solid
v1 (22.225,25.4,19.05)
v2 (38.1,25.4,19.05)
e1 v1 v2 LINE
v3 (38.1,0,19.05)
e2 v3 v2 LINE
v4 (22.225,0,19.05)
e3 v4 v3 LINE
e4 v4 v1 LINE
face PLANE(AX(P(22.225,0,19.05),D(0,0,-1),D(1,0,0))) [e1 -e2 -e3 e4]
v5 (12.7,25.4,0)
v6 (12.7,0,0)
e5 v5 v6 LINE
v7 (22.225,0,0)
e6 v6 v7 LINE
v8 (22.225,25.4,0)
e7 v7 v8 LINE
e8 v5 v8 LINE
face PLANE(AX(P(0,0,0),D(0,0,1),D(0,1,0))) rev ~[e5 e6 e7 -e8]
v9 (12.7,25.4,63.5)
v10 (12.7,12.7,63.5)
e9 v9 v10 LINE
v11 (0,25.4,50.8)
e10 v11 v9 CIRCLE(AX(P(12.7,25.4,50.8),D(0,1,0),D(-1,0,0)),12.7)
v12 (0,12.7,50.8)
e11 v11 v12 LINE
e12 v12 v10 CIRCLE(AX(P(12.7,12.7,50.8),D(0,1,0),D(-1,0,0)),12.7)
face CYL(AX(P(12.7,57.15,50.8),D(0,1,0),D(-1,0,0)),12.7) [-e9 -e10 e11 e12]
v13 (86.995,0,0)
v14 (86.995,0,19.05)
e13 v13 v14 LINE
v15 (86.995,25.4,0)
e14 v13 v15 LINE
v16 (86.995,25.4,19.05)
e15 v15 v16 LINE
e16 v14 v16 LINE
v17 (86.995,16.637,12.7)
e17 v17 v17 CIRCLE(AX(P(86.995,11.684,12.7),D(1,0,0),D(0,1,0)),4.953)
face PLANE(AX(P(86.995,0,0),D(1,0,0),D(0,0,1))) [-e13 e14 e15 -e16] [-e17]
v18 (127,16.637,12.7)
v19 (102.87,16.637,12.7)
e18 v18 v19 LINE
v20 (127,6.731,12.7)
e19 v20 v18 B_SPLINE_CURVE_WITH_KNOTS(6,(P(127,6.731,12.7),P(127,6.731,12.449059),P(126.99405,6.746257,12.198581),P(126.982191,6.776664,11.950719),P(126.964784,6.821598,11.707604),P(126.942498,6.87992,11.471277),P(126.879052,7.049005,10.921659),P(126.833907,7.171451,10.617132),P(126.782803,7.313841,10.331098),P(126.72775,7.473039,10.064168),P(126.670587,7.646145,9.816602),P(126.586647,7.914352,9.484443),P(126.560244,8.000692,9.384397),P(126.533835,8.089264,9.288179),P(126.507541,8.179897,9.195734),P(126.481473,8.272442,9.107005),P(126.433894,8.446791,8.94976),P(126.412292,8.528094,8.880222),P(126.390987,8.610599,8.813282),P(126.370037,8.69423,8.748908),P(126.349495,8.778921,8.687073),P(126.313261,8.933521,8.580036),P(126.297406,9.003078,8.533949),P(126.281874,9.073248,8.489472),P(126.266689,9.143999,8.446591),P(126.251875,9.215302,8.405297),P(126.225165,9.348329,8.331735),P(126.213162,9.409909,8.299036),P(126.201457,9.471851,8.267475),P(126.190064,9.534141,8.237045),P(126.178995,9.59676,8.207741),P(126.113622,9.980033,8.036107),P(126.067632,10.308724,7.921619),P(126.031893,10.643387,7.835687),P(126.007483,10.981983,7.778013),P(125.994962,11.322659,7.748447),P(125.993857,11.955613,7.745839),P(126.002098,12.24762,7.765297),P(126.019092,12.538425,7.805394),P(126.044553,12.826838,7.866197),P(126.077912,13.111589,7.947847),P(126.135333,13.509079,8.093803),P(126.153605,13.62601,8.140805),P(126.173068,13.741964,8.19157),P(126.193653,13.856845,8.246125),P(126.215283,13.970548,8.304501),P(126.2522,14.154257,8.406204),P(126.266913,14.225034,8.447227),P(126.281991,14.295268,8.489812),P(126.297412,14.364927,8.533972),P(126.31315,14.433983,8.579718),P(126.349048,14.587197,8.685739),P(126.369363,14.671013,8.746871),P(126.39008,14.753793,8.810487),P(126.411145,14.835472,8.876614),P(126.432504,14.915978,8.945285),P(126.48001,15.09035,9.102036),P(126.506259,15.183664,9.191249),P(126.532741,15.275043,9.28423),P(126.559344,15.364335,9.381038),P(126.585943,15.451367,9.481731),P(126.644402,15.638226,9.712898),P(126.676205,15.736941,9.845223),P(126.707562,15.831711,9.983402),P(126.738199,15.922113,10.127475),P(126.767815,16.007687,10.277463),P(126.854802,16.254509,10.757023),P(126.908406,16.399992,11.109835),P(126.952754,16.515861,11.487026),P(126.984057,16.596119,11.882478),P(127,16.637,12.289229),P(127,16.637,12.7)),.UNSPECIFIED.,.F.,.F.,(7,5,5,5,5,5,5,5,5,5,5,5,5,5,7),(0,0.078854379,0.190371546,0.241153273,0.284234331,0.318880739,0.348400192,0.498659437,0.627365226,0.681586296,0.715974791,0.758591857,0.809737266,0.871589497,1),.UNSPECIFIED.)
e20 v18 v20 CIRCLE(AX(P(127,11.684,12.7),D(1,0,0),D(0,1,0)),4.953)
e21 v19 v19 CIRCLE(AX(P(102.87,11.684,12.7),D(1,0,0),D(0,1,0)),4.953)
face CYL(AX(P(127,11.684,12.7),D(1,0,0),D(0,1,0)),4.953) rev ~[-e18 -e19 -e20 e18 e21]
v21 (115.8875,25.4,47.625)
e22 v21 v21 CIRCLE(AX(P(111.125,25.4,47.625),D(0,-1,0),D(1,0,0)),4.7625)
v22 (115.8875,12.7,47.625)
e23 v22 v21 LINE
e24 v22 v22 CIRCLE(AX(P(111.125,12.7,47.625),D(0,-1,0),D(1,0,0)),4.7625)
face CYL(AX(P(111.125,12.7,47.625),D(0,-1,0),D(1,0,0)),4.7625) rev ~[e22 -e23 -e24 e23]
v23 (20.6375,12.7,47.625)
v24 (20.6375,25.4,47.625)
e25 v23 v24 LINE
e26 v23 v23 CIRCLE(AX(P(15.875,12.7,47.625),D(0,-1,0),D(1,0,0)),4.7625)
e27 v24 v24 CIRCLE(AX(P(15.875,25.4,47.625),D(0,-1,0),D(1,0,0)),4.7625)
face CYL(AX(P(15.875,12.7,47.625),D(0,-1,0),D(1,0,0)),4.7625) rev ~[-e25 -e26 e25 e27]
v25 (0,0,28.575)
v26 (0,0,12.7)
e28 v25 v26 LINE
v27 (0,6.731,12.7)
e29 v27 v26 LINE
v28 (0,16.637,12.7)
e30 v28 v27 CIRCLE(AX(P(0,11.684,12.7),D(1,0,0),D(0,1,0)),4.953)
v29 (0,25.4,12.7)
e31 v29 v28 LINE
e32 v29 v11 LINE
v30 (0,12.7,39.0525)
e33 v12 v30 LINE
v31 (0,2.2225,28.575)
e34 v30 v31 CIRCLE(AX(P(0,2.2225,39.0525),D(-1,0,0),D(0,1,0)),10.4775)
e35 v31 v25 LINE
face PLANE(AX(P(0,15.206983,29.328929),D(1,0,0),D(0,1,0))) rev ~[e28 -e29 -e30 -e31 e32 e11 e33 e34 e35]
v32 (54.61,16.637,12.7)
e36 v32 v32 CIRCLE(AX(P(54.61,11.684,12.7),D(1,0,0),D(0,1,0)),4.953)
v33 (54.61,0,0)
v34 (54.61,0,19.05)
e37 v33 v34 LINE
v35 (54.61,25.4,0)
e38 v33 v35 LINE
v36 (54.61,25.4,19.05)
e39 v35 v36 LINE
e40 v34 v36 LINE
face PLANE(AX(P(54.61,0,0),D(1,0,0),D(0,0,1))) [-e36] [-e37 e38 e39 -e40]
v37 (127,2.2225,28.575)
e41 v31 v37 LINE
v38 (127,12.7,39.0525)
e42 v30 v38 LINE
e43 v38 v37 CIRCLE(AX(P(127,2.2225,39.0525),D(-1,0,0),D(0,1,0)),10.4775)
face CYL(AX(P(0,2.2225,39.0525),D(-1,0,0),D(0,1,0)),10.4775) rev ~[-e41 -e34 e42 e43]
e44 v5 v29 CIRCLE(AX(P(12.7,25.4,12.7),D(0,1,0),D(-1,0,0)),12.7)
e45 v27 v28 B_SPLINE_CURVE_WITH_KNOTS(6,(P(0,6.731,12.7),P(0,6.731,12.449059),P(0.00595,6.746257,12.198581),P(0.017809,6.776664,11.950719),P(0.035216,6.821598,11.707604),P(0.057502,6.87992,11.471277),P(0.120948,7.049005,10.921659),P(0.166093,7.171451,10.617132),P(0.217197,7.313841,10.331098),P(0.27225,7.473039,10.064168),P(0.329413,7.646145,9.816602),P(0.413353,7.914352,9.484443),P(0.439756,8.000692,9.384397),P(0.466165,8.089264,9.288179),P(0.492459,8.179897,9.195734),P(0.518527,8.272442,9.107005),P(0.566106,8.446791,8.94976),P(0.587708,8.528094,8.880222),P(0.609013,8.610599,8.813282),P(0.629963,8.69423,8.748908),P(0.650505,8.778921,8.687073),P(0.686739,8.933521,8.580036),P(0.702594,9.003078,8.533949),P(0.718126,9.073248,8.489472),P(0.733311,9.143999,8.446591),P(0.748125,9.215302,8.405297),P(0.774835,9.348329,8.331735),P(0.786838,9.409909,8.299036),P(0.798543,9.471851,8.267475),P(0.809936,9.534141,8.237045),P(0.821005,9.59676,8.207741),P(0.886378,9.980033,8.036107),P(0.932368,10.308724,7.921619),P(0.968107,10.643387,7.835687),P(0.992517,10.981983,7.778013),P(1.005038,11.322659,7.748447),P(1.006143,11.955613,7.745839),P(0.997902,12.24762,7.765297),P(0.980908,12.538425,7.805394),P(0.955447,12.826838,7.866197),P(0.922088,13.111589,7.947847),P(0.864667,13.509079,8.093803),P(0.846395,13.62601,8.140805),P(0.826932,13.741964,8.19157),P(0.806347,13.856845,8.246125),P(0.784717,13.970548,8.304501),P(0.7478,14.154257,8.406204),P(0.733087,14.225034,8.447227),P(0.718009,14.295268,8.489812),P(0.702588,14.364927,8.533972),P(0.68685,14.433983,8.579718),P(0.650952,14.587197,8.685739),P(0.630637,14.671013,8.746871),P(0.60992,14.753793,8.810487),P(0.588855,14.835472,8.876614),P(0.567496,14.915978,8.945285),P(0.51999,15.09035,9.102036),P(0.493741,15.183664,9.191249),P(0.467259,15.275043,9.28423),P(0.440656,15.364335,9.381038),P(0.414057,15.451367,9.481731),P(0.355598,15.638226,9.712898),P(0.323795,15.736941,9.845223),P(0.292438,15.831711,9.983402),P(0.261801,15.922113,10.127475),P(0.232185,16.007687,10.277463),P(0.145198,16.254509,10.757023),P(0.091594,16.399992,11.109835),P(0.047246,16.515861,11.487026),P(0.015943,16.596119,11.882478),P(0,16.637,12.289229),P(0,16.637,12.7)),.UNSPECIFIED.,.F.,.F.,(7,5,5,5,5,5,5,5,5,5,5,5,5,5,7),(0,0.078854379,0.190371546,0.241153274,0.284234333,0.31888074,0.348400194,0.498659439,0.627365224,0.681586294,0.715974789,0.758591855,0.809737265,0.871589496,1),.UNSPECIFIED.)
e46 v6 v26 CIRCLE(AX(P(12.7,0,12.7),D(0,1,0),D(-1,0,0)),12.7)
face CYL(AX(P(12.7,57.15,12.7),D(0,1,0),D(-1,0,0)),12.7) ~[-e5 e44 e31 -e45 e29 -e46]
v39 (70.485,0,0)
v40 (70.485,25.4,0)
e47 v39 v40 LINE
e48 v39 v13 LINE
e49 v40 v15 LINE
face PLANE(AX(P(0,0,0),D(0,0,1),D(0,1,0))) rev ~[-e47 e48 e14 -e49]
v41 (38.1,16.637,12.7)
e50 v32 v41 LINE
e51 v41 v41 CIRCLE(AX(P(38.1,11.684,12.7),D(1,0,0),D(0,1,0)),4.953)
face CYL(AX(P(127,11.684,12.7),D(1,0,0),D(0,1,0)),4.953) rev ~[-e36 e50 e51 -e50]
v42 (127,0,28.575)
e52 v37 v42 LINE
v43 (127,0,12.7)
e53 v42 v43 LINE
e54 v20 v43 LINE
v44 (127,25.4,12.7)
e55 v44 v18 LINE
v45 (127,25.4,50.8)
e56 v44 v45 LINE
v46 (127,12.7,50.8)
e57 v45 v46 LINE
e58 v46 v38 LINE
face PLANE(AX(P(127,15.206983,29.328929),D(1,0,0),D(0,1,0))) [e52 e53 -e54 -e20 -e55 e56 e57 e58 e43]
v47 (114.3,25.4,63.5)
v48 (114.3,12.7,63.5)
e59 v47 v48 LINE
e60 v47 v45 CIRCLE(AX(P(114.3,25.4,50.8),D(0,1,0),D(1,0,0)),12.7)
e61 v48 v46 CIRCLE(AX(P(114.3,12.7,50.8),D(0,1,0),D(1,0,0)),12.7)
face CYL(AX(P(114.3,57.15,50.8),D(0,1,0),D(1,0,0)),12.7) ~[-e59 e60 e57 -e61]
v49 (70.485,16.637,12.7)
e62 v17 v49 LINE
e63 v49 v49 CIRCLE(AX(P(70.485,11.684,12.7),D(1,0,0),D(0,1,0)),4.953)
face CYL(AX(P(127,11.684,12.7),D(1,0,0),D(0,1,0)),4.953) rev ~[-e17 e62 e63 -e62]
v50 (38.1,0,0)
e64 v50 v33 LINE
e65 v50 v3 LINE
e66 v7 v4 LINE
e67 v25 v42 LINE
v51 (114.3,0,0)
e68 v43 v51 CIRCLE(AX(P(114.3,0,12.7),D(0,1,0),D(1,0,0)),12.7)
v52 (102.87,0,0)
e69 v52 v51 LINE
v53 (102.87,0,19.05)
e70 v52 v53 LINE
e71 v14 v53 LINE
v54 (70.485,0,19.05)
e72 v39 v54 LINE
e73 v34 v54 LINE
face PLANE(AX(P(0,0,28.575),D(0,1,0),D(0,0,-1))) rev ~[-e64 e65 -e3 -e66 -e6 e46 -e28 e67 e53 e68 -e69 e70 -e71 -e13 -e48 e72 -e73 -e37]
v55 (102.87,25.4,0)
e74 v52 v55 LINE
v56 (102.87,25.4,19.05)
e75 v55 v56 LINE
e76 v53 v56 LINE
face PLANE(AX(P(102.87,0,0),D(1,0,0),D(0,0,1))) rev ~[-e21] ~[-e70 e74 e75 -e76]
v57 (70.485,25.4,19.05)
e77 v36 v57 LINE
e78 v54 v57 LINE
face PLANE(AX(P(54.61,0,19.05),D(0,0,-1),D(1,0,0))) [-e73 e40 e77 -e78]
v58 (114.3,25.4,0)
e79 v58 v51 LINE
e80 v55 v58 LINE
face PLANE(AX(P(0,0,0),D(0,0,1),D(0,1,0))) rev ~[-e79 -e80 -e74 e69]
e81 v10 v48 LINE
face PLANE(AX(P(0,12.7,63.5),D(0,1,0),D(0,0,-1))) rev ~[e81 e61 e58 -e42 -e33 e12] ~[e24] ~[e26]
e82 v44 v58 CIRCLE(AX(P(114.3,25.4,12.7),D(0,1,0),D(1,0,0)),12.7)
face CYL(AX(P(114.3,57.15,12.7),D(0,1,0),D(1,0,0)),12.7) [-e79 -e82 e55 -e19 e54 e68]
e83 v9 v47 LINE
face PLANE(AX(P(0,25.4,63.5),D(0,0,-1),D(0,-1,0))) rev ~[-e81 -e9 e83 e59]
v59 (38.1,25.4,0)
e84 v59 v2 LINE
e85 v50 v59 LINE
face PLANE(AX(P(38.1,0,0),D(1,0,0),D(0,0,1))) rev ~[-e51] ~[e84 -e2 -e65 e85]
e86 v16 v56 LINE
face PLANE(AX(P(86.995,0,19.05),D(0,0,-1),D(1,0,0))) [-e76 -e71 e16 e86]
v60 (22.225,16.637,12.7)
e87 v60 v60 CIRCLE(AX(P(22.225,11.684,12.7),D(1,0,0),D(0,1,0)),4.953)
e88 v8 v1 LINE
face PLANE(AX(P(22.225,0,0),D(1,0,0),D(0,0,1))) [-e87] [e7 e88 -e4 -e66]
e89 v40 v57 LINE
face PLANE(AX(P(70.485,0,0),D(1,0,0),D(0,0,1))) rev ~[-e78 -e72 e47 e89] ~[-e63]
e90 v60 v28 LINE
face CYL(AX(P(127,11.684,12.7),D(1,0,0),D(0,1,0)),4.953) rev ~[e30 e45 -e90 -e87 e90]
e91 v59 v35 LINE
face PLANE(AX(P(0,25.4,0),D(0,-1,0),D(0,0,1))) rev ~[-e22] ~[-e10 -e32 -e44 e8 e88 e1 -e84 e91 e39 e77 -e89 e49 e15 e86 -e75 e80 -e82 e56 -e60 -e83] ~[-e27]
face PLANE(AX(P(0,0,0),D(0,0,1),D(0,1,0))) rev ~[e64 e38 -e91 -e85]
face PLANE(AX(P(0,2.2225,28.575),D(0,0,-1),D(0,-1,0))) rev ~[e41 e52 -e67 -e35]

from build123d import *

# Parameters (mm, degrees)
F1_DEPTH    = 127
F2_R        = 4.7625
F3_DEPTH    = 25.4
F4_W        = 15.875
F4_H        = 19.05
F5_DEPTH    = 25.401
F6_R        = 4.953
F7_DEPTH    = 127.001
F8_T1_DEPTH = 76.2
F8_T3_DEPTH = 88.9


# Not quite as in the source:
# - a fillet or chamfer that OpenCascade refuses, or shapes differently, is made with other operations: its cross-section is extruded or revolved along the edge and cut away or added


with BuildPart() as f1:
    # F0 (on Right) → F1 (new body)
    with BuildSketch(Plane.YZ):
        with BuildLine():
            Line((0, 28.575), (0, 0))
            Line((0, 0), (25.4, 0))
            Line((25.4, 0), (25.4, 63.5))
            Line((25.4, 63.5), (12.7, 63.5))
            Line((12.7, 63.5), (12.7, 39.0525))
            ThreePointArc((12.7, 39.0525), (9.6312112999, 31.6437887001), (2.2225, 28.575))
            Line((2.2225, 28.575), (0, 28.575))
        make_face()
    extrude(amount=F1_DEPTH)

    # F2 (on face) → F3 (cut)
    with BuildSketch(Plane.XZ.offset(-12.7)):
        with Locations((111.125, 47.625)):
            Circle(F2_R)
        with Locations((15.875, 47.625)):
            Circle(F2_R)
    extrude(amount=-F3_DEPTH, mode=Mode.SUBTRACT)

    # F4 (on face) → F5 (cut, through all)
    with BuildSketch(Plane.XZ):
        with Locations((94.9325, 9.525)):
            Rectangle(F4_W, F4_H)
        with Locations((62.5475, 9.525)):
            Rectangle(F4_W, F4_H)
        with Locations((30.1625, 9.525)):
            Rectangle(F4_W, F4_H)
    extrude(amount=-F5_DEPTH, mode=Mode.SUBTRACT)

    # F6 (on face) → F7 (cut, through all)
    with BuildSketch(Plane.YZ.offset(127)):
        with Locations((11.684, 12.7)):
            Circle(F6_R)
    extrude(amount=-F7_DEPTH, mode=Mode.SUBTRACT)

    # F8: fillet of radius 12.7 on 4 edges, made by hand

    # F8_s2 → F8_t1 (cut)
    with BuildSketch(Plane.XZ.offset(-57.15)):
        with BuildLine():
            ThreePointArc((0, 50.8), (3.7197438789, 59.7802561211), (12.7, 63.5))
            Line((12.7, 63.5), (0, 63.5))
            Line((0, 63.5), (0, 50.8))
        make_face()
        with BuildLine():
            ThreePointArc((127, 50.8), (123.2802561211, 59.7802561211), (114.3, 63.5))
            Line((114.3, 63.5), (127, 63.5))
            Line((127, 63.5), (127, 50.8))
        make_face()
    extrude(amount=F8_T1_DEPTH, mode=Mode.SUBTRACT)

    # F8_s4 → F8_t3 (cut)
    with BuildSketch(Plane.XZ.offset(-57.15)):
        with BuildLine():
            ThreePointArc((0, 12.7), (3.7197438789, 3.7197438789), (12.7, 0))
            Line((12.7, 0), (0, 0))
            Line((0, 0), (0, 12.7))
        make_face()
        with BuildLine():
            ThreePointArc((127, 12.7), (123.2802561211, 3.7197438789), (114.3, 0))
            Line((114.3, 0), (127, 0))
            Line((127, 0), (127, 12.7))
        make_face()
    extrude(amount=F8_T3_DEPTH, mode=Mode.SUBTRACT)


solid = f1.part
